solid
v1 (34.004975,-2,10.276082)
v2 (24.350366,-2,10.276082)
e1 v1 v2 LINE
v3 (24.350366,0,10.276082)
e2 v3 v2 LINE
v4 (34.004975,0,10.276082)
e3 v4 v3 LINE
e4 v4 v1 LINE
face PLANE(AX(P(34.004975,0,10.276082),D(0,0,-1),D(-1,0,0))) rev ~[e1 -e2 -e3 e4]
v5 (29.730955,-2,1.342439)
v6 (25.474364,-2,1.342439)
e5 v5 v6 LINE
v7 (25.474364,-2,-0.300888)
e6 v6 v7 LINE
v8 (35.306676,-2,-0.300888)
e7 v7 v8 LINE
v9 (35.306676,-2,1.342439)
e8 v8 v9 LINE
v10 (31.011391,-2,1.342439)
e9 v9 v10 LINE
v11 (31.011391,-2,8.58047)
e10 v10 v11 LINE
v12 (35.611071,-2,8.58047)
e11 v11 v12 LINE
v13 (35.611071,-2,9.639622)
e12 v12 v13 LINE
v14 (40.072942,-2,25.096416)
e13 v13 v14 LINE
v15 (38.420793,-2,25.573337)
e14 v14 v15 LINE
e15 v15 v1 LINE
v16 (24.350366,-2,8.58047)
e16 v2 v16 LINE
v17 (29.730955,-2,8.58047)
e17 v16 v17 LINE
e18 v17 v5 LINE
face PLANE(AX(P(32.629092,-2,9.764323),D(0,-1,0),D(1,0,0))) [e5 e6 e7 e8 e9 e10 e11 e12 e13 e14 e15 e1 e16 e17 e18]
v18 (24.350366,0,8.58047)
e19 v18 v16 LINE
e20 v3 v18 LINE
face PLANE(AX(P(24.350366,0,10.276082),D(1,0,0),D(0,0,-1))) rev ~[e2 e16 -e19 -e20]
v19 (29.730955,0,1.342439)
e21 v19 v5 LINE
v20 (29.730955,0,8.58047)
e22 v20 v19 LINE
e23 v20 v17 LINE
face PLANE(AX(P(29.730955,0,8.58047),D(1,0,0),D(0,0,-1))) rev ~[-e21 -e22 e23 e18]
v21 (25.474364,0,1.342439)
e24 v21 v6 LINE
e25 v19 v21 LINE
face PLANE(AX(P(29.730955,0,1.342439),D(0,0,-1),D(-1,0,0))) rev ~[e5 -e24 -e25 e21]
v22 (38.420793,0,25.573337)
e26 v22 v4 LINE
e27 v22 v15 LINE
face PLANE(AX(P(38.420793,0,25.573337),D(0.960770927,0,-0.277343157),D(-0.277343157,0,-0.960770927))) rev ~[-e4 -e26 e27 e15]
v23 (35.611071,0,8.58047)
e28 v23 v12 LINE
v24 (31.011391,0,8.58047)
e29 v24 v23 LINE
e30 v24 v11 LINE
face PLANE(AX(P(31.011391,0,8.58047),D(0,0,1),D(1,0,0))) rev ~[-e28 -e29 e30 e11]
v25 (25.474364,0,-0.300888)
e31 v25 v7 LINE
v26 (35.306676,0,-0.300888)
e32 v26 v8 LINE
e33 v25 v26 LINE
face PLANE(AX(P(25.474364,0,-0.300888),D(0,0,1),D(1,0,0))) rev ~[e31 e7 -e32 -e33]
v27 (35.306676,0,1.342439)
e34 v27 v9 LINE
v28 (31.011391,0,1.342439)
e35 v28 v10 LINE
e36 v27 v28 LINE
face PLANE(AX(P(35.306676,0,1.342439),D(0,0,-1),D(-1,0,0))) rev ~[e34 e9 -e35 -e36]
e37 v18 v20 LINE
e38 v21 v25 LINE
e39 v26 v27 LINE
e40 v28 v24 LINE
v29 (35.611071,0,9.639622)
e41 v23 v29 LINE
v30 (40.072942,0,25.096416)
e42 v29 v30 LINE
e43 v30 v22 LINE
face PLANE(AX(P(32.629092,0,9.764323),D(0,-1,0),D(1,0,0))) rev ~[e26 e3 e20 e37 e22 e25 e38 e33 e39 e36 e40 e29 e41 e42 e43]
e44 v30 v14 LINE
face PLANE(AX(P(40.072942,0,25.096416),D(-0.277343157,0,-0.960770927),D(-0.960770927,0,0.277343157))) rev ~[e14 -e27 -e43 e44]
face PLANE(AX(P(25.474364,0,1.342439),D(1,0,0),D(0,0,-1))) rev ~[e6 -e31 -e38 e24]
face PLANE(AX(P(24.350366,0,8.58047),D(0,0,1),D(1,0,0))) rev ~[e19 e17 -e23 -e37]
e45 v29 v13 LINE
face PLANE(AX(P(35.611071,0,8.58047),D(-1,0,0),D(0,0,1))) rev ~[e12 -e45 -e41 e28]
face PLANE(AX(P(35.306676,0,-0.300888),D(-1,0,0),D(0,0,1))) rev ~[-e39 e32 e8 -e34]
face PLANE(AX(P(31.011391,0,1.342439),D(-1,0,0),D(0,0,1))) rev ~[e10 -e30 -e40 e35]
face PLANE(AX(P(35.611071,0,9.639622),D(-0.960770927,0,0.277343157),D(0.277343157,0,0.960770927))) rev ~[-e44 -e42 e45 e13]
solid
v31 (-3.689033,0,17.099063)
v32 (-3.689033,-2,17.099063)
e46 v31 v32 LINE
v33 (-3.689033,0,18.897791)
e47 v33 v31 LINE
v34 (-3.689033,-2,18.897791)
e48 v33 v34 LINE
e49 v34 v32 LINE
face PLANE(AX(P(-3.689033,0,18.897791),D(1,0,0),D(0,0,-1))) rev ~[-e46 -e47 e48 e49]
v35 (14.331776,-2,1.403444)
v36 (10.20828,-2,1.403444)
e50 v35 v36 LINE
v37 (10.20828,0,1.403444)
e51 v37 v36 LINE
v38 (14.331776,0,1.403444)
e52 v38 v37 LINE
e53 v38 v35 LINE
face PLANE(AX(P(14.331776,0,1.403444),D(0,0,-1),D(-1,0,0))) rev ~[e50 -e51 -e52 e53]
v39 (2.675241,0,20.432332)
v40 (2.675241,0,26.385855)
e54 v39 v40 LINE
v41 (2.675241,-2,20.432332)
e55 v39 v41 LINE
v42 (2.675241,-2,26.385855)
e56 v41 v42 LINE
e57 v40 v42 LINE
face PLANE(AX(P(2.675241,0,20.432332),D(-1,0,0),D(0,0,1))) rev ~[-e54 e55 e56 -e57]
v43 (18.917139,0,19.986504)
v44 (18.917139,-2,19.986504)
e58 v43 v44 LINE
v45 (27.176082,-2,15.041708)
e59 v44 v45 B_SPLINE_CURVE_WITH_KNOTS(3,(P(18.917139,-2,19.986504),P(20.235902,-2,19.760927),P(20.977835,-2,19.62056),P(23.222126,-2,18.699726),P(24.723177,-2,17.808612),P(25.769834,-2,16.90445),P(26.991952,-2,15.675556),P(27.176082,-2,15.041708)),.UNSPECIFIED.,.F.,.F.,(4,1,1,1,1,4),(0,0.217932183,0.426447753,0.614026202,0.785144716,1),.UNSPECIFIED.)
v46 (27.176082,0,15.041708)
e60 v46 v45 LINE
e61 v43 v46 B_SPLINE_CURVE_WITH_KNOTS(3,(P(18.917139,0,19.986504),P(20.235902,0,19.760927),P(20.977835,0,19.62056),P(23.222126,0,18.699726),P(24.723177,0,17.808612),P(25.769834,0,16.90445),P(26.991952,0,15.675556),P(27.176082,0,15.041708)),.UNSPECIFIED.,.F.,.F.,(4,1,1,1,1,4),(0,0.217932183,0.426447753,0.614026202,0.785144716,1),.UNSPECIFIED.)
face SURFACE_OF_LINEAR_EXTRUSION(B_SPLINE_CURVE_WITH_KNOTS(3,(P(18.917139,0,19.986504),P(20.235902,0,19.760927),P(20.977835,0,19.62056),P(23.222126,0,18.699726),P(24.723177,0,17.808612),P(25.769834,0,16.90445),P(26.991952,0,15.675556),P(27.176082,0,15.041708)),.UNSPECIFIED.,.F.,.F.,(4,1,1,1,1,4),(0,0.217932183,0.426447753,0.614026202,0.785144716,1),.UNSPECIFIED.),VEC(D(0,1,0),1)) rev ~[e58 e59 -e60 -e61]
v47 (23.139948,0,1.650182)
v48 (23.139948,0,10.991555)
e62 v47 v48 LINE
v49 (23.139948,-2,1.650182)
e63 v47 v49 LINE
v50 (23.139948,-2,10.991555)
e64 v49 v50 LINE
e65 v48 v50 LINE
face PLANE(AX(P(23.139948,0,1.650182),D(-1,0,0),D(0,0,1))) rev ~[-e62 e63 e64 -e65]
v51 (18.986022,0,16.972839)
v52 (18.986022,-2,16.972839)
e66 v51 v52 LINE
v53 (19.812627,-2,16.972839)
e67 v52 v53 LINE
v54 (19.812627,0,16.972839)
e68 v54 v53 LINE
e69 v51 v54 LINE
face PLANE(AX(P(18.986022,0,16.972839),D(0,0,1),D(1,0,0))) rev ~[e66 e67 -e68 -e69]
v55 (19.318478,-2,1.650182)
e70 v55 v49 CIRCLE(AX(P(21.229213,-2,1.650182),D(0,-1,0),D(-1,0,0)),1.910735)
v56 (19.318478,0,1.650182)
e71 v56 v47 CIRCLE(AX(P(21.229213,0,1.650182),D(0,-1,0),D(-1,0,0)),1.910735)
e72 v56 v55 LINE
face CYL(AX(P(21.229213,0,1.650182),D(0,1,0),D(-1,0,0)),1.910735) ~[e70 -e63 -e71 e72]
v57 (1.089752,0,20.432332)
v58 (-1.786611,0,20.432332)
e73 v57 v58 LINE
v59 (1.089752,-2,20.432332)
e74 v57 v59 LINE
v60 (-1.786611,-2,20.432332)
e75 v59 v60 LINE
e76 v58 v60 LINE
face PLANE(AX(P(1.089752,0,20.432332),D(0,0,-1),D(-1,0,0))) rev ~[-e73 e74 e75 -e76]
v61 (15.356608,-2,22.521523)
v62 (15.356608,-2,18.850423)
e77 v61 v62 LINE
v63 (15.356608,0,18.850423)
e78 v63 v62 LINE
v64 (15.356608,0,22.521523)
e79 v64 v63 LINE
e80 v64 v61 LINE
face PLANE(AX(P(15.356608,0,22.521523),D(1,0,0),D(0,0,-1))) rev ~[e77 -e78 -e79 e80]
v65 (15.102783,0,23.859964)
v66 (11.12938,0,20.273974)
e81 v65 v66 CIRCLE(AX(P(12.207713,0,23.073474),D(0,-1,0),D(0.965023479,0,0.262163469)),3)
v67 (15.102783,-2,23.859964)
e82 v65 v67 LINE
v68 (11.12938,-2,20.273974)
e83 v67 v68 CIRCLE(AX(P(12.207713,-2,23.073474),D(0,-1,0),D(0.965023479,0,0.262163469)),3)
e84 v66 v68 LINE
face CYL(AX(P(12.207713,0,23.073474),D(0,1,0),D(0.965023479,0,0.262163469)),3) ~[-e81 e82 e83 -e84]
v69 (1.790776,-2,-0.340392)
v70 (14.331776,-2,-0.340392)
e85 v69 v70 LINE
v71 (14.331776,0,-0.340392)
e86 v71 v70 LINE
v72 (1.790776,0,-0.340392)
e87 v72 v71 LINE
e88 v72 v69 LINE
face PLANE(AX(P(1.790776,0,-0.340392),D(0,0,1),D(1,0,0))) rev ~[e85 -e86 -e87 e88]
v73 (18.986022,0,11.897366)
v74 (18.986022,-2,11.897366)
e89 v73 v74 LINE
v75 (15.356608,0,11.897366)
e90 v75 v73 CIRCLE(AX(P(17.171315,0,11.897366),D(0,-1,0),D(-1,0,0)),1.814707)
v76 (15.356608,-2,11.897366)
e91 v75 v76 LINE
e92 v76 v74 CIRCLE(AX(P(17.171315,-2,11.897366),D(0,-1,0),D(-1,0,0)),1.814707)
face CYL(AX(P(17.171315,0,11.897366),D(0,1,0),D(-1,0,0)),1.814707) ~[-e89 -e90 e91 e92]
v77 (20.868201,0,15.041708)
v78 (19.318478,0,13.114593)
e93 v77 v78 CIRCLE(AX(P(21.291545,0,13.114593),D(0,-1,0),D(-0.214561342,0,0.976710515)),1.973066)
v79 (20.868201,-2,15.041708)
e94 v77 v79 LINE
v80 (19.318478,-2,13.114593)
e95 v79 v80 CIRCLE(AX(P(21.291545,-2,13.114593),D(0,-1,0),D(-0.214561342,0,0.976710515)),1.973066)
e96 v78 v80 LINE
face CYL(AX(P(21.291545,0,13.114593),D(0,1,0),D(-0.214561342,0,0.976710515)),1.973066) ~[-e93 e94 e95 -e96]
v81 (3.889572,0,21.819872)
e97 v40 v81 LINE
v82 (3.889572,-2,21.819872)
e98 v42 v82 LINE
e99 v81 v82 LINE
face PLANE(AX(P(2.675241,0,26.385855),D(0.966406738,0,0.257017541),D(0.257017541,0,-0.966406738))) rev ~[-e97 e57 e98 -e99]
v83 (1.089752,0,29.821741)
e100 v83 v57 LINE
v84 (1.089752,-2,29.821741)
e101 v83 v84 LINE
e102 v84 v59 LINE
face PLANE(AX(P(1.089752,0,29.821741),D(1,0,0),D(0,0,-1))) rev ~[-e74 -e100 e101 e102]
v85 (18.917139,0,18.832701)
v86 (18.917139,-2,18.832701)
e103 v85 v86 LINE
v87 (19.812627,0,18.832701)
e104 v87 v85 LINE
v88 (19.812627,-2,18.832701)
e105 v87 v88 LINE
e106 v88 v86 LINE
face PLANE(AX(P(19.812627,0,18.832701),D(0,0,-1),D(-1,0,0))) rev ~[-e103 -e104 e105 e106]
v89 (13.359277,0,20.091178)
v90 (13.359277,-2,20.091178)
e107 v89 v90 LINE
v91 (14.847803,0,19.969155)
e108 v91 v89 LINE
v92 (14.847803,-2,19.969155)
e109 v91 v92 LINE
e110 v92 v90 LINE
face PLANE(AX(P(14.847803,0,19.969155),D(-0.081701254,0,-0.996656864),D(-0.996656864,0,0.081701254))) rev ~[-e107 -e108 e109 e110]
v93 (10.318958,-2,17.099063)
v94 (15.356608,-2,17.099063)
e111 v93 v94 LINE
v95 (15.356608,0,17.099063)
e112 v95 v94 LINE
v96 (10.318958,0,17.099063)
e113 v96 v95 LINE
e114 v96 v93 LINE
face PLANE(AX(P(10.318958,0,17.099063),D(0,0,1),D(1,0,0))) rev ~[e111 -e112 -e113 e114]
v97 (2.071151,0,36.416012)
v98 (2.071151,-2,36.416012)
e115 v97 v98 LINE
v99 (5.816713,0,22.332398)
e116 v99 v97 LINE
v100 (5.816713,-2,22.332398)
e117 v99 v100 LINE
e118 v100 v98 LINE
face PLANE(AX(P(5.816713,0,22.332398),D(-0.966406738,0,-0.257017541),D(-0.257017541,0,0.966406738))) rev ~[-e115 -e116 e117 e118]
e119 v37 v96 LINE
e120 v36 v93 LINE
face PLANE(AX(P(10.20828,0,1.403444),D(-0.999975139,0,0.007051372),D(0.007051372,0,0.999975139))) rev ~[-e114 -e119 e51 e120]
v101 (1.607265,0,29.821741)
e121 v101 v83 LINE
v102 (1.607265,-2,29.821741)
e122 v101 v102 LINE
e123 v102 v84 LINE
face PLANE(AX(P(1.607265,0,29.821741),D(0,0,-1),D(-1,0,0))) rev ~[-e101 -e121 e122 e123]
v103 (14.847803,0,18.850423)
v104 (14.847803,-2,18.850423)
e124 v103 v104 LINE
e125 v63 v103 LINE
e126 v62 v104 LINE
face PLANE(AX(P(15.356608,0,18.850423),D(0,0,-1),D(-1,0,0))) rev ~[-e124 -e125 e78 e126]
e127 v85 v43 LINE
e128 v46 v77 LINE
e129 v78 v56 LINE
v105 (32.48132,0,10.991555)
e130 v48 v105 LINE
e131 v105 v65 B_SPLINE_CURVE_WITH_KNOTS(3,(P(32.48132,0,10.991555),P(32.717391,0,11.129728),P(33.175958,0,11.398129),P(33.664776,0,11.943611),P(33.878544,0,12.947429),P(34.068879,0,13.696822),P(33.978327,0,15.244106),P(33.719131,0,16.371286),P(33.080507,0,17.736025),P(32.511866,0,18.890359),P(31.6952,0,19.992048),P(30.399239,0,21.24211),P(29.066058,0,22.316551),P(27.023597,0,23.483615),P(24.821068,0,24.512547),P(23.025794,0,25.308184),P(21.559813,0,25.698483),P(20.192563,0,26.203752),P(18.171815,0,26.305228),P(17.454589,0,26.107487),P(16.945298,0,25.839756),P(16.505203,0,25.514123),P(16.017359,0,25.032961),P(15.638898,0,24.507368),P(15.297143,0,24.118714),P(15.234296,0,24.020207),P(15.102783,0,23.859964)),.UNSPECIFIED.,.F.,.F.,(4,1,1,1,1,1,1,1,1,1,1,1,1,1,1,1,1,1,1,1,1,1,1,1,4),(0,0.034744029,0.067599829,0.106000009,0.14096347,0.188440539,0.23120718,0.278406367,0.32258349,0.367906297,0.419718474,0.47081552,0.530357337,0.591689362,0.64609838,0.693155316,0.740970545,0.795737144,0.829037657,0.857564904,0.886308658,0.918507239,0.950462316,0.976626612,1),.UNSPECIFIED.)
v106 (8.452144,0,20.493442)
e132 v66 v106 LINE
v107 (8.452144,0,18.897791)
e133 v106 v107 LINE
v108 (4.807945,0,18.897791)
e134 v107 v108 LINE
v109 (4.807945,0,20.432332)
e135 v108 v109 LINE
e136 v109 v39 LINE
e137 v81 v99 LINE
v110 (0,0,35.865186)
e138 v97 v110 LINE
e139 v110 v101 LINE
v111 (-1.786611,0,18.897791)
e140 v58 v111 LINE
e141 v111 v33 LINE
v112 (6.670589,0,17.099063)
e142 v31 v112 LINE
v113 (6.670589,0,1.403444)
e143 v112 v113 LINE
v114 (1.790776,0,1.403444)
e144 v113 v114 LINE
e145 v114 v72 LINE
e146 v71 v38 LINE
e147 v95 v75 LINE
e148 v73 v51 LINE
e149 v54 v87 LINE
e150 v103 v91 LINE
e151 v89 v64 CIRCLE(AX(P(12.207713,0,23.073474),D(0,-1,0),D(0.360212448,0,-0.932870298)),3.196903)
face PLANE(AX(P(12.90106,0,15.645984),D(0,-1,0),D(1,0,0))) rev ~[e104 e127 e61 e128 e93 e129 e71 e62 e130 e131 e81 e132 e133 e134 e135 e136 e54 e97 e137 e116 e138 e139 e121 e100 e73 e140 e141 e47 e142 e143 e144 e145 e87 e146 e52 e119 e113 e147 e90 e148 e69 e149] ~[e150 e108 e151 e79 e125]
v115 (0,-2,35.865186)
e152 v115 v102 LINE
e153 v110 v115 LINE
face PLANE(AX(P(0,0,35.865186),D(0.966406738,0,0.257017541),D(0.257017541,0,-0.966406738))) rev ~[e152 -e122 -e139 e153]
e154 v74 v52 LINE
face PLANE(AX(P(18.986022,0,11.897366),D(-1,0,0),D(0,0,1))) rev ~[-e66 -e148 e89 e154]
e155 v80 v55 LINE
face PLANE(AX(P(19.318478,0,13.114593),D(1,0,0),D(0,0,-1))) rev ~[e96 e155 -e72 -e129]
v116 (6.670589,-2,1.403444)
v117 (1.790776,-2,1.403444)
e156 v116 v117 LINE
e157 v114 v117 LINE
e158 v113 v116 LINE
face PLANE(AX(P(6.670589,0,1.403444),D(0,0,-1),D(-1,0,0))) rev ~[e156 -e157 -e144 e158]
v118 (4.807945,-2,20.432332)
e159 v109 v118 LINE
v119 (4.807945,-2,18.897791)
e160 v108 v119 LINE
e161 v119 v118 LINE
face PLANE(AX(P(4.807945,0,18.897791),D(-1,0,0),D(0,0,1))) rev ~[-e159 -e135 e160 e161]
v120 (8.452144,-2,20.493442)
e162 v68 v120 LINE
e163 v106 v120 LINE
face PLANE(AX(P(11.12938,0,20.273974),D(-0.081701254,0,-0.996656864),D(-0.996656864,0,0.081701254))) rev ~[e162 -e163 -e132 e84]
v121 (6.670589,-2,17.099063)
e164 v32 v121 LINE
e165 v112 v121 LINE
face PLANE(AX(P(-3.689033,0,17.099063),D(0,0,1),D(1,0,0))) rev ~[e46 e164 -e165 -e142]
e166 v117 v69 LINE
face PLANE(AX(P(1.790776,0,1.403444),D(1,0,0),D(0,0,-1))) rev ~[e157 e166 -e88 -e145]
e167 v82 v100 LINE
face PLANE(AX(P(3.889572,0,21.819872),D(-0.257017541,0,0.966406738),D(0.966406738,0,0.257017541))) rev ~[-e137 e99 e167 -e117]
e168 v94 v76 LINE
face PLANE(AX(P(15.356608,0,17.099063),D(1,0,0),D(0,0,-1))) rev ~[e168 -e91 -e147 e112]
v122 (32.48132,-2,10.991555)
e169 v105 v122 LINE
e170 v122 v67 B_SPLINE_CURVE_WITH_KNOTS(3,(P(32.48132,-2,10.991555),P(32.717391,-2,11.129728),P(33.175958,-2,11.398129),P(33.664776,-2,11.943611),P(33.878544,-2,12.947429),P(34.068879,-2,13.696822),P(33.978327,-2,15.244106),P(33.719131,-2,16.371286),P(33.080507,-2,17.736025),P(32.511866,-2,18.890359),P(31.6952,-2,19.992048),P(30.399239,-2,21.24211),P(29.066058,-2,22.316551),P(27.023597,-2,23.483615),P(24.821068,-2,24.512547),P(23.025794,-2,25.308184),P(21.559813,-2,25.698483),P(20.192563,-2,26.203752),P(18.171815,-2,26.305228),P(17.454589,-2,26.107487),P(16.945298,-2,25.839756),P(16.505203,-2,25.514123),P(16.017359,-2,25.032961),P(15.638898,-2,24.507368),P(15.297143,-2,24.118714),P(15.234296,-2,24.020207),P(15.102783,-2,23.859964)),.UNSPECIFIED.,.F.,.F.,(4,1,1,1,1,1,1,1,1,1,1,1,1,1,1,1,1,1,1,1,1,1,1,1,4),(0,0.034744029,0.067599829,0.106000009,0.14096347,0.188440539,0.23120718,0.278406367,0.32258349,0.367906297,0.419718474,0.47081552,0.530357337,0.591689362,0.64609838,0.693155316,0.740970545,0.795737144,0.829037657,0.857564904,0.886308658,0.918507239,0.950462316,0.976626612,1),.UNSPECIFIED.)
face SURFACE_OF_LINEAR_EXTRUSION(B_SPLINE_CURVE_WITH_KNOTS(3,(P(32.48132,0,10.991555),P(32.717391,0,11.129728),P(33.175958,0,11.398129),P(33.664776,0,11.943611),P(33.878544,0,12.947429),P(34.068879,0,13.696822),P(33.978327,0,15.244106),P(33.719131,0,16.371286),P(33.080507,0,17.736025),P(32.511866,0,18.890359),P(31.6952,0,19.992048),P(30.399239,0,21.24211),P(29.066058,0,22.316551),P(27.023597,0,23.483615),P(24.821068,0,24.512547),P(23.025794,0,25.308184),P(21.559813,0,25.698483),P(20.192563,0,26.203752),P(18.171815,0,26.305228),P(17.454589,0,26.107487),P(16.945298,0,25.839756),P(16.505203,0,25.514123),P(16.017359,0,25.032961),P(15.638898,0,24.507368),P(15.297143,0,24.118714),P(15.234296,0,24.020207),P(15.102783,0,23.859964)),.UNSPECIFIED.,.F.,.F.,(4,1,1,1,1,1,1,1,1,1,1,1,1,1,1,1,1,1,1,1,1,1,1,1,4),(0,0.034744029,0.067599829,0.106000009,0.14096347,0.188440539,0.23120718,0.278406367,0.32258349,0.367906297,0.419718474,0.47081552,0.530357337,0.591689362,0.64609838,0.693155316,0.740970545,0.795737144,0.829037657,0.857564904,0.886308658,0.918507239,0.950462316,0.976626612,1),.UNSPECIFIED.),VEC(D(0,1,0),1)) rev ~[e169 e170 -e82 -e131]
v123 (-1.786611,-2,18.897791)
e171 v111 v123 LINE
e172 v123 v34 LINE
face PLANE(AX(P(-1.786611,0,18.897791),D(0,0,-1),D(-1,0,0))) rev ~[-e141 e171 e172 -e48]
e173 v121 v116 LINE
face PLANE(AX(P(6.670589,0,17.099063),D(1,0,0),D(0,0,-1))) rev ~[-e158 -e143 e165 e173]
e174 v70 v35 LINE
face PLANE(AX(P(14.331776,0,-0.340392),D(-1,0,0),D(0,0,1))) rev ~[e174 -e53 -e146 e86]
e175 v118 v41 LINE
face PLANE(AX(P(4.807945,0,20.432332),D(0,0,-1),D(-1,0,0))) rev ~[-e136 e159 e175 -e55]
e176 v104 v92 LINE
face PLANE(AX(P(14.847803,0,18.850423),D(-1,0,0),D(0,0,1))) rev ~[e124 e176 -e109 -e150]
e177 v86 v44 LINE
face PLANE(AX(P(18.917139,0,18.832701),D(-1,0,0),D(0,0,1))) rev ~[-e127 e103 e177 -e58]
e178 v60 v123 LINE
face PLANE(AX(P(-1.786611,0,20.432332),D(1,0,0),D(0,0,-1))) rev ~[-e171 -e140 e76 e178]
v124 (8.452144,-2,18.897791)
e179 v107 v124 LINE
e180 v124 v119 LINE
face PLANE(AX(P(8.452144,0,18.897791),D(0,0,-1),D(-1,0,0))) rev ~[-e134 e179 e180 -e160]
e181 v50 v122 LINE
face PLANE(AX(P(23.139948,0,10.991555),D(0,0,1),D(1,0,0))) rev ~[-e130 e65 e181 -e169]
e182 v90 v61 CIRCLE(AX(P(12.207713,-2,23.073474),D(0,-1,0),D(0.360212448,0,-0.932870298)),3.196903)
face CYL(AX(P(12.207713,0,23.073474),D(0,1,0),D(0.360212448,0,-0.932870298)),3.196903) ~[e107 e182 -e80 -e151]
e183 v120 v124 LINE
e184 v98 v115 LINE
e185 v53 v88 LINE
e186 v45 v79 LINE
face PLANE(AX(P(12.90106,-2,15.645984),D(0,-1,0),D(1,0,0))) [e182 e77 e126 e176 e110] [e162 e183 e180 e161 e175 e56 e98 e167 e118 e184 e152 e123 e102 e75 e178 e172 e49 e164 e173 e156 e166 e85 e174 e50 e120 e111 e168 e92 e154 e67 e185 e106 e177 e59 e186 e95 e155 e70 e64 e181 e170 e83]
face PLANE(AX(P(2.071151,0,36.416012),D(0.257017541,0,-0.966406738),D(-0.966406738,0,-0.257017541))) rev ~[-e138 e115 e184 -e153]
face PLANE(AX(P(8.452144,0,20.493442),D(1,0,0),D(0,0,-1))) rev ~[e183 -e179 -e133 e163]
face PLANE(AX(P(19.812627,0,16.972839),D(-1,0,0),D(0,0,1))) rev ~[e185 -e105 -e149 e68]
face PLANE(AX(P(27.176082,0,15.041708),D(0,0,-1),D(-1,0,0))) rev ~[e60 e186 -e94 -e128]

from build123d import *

# Parameters (mm, degrees)
F1_DEPTH = 2


# Not quite as in the source:
# - a feature of the source that left no trace in its solid (it failed there, or was rolled back) is left out


with BuildPart() as f1:
    # F0 (on Front) → F1 (new body)
    with BuildSketch(Plane.XZ):
        with BuildLine():
            Line((18.9171390745, 18.8327007444), (18.9171390745, 19.9865035199))
            add(Edge.make_bspline(
                [(18.9171390745, 19.9865035199), (20.2359017059, 19.7609265773), (20.9778353537, 19.6205597026), (23.2221259054, 18.699726427), (24.7231770067, 17.8086116304), (25.7698344015, 16.9044499376), (26.9919522107, 15.6755559146), (27.1760820528, 15.0417076929)],
                knots=[0, 0, 0, 0, 0.2179321827, 0.4264477532, 0.6140262018, 0.7851447158, 1, 1, 1, 1], degree=3))
            Line((27.1760820528, 15.0417076929), (20.8682008088, 15.0417076929))
            ThreePointArc((20.8682008088, 15.0417076929), (19.753969154, 14.3510608736), (19.318478182, 13.1145929918))
            Line((19.318478182, 13.1145929918), (19.318478182, 1.6501822975))
            ThreePointArc((19.318478182, 1.6501822975), (21.2292131037, -0.2605526242), (23.1399480253, 1.6501822975))
            Line((23.1399480253, 1.6501822975), (23.1399480253, 10.9915547073))
            Line((23.1399480253, 10.9915547073), (32.4813202024, 10.9915547073))
            add(Edge.make_bspline(
                [(32.4813202024, 10.9915547073), (32.7173913015, 11.1297281374), (33.1759580653, 11.3981287793), (33.6647764756, 11.943610763), (33.8785442051, 12.9474288042), (34.0688789671, 13.6968216831), (33.9783273465, 15.2441055836), (33.7191306214, 16.3712863899), (33.0805074051, 17.736024655), (32.5118657998, 18.8903594103), (31.6952000931, 19.9920483371), (30.3992394359, 21.2421100827), (29.0660577632, 22.3165505623), (27.023596623, 23.4836145379), (24.8210679729, 24.5125473654), (23.0257936504, 25.3081835207), (21.5598125958, 25.6984832194), (20.1925631903, 26.2037521602), (18.1718154029, 26.3052282349), (17.4545886694, 26.1074868938), (16.9452981604, 25.8397557796), (16.5052029261, 25.5141227487), (16.0173593733, 25.032961087), (15.6388983087, 24.5073680239), (15.2971428532, 24.1187135914), (15.2342961271, 24.0202073944), (15.1027834162, 23.8599643513)],
                knots=[0, 0, 0, 0, 0.0347440285, 0.0675998285, 0.1060000091, 0.1409634696, 0.1884405393, 0.2312071797, 0.278406367, 0.3225834899, 0.3679062968, 0.4197184745, 0.4708155203, 0.5303573368, 0.5916893616, 0.6460983797, 0.6931553162, 0.7409705446, 0.7957371438, 0.829037657, 0.8575649043, 0.886308658, 0.9185072385, 0.9504623164, 0.9766266121, 1, 1, 1, 1], degree=3))
            ThreePointArc((15.1027834162, 23.8599643513), (10.197746642, 25.3005876217), (11.1293799055, 20.2739743856))
            Line((11.1293799055, 20.2739743856), (8.4521435651, 20.4934416608))
            Line((8.4521435651, 20.4934416608), (8.4521435651, 18.8977912164))
            Line((8.4521435651, 18.8977912164), (4.807944844, 18.8977912164))
            Line((4.807944844, 18.8977912164), (4.807944844, 20.4323317588))
            Line((4.807944844, 20.4323317588), (2.6752410345, 20.4323317588))
            Line((2.6752410345, 20.4323317588), (2.6752410345, 26.3858548469))
            Line((2.6752410345, 26.3858548469), (3.8895721523, 21.8198716526))
            Line((3.8895721523, 21.8198716526), (5.8167126214, 22.3323979893))
            Line((5.8167126214, 22.3323979893), (2.0711510672, 36.4160123011))
            Line((2.0711510672, 36.4160123011), (0, 35.8651860971))
            Line((0, 35.8651860971), (1.6072647653, 29.8217406155))
            Line((1.6072647653, 29.8217406155), (1.0897519525, 29.8217406155))
            Line((1.0897519525, 29.8217406155), (1.0897519525, 20.4323317588))
            Line((1.0897519525, 20.4323317588), (-1.7866106892, 20.4323317588))
            Line((-1.7866106892, 20.4323317588), (-1.7866106892, 18.8977912164))
            Line((-1.7866106892, 18.8977912164), (-3.689032536, 18.8977912164))
            Line((-3.689032536, 18.8977912164), (-3.689032536, 17.0990628984))
            Line((-3.689032536, 17.0990628984), (6.6705888528, 17.0990628984))
            Line((6.6705888528, 17.0990628984), (6.6705888528, 1.4034443302))
            Line((6.6705888528, 1.4034443302), (1.7907759175, 1.4034443302))
            Line((1.7907759175, 1.4034443302), (1.7907759175, -0.3403924929))
            Line((1.7907759175, -0.3403924929), (14.3317757174, -0.3403924929))
            Line((14.3317757174, -0.3403924929), (14.3317757174, 1.4034443302))
            Line((14.3317757174, 1.4034443302), (10.2082798046, 1.4034443302))
            Line((10.2082798046, 1.4034443302), (10.3189582005, 17.0990628984))
            Line((10.3189582005, 17.0990628984), (15.356608129, 17.0990628984))
            Line((15.356608129, 17.0990628984), (15.356608129, 11.8973655189))
            ThreePointArc((15.356608129, 11.8973655189), (17.1713152045, 10.0826584434), (18.98602228, 11.8973655189))
            Line((18.98602228, 11.8973655189), (18.98602228, 16.9728393323))
            Line((18.98602228, 16.9728393323), (19.8126273521, 16.9728393323))
            Line((19.8126273521, 16.9728393323), (19.8126273521, 18.8327007444))
            Line((19.8126273521, 18.8327007444), (18.9171390745, 18.8327007444))
        make_face()
        with BuildLine():
            ThreePointArc((13.3592773256, 20.0911778564), (14.6775576036, 21.0436813613), (15.356608129, 22.5215230991))
            Line((15.356608129, 22.5215230991), (15.356608129, 18.8504233956))
            Line((15.356608129, 18.8504233956), (14.8478032858, 18.8504233956))
            Line((14.8478032858, 18.8504233956), (14.8478032858, 19.9691554815))
            Line((14.8478032858, 19.9691554815), (13.3592773256, 20.0911778564))
        make_face(mode=Mode.SUBTRACT)
    extrude(amount=F1_DEPTH)


with BuildPart() as f1b:
    # F0 (on Front) → F1, piece 2 (new body)
    with BuildSketch(Plane.XZ):
        Polygon((38.4207926691, 25.5733374506), (34.0049751103, 10.2760819718), (24.3503656238, 10.2760819718), (24.3503656238, 8.5804695264), (29.7309551388, 8.5804695264), (29.7309551388, 1.3424385106), (25.474363938, 1.3424385106), (25.474363938, -0.3008880303), (35.3066762154, -0.3008880303), (35.3066762154, 1.3424385106), (31.0113914311, 1.3424385106), (31.0113914311, 8.5804695264), (35.6110706925, 8.5804695264), (35.6110706925, 9.6396217123), (40.0729418852, 25.096415984), align=None)
    extrude(amount=F1_DEPTH)


solid = Compound([f1.part, f1b.part])
